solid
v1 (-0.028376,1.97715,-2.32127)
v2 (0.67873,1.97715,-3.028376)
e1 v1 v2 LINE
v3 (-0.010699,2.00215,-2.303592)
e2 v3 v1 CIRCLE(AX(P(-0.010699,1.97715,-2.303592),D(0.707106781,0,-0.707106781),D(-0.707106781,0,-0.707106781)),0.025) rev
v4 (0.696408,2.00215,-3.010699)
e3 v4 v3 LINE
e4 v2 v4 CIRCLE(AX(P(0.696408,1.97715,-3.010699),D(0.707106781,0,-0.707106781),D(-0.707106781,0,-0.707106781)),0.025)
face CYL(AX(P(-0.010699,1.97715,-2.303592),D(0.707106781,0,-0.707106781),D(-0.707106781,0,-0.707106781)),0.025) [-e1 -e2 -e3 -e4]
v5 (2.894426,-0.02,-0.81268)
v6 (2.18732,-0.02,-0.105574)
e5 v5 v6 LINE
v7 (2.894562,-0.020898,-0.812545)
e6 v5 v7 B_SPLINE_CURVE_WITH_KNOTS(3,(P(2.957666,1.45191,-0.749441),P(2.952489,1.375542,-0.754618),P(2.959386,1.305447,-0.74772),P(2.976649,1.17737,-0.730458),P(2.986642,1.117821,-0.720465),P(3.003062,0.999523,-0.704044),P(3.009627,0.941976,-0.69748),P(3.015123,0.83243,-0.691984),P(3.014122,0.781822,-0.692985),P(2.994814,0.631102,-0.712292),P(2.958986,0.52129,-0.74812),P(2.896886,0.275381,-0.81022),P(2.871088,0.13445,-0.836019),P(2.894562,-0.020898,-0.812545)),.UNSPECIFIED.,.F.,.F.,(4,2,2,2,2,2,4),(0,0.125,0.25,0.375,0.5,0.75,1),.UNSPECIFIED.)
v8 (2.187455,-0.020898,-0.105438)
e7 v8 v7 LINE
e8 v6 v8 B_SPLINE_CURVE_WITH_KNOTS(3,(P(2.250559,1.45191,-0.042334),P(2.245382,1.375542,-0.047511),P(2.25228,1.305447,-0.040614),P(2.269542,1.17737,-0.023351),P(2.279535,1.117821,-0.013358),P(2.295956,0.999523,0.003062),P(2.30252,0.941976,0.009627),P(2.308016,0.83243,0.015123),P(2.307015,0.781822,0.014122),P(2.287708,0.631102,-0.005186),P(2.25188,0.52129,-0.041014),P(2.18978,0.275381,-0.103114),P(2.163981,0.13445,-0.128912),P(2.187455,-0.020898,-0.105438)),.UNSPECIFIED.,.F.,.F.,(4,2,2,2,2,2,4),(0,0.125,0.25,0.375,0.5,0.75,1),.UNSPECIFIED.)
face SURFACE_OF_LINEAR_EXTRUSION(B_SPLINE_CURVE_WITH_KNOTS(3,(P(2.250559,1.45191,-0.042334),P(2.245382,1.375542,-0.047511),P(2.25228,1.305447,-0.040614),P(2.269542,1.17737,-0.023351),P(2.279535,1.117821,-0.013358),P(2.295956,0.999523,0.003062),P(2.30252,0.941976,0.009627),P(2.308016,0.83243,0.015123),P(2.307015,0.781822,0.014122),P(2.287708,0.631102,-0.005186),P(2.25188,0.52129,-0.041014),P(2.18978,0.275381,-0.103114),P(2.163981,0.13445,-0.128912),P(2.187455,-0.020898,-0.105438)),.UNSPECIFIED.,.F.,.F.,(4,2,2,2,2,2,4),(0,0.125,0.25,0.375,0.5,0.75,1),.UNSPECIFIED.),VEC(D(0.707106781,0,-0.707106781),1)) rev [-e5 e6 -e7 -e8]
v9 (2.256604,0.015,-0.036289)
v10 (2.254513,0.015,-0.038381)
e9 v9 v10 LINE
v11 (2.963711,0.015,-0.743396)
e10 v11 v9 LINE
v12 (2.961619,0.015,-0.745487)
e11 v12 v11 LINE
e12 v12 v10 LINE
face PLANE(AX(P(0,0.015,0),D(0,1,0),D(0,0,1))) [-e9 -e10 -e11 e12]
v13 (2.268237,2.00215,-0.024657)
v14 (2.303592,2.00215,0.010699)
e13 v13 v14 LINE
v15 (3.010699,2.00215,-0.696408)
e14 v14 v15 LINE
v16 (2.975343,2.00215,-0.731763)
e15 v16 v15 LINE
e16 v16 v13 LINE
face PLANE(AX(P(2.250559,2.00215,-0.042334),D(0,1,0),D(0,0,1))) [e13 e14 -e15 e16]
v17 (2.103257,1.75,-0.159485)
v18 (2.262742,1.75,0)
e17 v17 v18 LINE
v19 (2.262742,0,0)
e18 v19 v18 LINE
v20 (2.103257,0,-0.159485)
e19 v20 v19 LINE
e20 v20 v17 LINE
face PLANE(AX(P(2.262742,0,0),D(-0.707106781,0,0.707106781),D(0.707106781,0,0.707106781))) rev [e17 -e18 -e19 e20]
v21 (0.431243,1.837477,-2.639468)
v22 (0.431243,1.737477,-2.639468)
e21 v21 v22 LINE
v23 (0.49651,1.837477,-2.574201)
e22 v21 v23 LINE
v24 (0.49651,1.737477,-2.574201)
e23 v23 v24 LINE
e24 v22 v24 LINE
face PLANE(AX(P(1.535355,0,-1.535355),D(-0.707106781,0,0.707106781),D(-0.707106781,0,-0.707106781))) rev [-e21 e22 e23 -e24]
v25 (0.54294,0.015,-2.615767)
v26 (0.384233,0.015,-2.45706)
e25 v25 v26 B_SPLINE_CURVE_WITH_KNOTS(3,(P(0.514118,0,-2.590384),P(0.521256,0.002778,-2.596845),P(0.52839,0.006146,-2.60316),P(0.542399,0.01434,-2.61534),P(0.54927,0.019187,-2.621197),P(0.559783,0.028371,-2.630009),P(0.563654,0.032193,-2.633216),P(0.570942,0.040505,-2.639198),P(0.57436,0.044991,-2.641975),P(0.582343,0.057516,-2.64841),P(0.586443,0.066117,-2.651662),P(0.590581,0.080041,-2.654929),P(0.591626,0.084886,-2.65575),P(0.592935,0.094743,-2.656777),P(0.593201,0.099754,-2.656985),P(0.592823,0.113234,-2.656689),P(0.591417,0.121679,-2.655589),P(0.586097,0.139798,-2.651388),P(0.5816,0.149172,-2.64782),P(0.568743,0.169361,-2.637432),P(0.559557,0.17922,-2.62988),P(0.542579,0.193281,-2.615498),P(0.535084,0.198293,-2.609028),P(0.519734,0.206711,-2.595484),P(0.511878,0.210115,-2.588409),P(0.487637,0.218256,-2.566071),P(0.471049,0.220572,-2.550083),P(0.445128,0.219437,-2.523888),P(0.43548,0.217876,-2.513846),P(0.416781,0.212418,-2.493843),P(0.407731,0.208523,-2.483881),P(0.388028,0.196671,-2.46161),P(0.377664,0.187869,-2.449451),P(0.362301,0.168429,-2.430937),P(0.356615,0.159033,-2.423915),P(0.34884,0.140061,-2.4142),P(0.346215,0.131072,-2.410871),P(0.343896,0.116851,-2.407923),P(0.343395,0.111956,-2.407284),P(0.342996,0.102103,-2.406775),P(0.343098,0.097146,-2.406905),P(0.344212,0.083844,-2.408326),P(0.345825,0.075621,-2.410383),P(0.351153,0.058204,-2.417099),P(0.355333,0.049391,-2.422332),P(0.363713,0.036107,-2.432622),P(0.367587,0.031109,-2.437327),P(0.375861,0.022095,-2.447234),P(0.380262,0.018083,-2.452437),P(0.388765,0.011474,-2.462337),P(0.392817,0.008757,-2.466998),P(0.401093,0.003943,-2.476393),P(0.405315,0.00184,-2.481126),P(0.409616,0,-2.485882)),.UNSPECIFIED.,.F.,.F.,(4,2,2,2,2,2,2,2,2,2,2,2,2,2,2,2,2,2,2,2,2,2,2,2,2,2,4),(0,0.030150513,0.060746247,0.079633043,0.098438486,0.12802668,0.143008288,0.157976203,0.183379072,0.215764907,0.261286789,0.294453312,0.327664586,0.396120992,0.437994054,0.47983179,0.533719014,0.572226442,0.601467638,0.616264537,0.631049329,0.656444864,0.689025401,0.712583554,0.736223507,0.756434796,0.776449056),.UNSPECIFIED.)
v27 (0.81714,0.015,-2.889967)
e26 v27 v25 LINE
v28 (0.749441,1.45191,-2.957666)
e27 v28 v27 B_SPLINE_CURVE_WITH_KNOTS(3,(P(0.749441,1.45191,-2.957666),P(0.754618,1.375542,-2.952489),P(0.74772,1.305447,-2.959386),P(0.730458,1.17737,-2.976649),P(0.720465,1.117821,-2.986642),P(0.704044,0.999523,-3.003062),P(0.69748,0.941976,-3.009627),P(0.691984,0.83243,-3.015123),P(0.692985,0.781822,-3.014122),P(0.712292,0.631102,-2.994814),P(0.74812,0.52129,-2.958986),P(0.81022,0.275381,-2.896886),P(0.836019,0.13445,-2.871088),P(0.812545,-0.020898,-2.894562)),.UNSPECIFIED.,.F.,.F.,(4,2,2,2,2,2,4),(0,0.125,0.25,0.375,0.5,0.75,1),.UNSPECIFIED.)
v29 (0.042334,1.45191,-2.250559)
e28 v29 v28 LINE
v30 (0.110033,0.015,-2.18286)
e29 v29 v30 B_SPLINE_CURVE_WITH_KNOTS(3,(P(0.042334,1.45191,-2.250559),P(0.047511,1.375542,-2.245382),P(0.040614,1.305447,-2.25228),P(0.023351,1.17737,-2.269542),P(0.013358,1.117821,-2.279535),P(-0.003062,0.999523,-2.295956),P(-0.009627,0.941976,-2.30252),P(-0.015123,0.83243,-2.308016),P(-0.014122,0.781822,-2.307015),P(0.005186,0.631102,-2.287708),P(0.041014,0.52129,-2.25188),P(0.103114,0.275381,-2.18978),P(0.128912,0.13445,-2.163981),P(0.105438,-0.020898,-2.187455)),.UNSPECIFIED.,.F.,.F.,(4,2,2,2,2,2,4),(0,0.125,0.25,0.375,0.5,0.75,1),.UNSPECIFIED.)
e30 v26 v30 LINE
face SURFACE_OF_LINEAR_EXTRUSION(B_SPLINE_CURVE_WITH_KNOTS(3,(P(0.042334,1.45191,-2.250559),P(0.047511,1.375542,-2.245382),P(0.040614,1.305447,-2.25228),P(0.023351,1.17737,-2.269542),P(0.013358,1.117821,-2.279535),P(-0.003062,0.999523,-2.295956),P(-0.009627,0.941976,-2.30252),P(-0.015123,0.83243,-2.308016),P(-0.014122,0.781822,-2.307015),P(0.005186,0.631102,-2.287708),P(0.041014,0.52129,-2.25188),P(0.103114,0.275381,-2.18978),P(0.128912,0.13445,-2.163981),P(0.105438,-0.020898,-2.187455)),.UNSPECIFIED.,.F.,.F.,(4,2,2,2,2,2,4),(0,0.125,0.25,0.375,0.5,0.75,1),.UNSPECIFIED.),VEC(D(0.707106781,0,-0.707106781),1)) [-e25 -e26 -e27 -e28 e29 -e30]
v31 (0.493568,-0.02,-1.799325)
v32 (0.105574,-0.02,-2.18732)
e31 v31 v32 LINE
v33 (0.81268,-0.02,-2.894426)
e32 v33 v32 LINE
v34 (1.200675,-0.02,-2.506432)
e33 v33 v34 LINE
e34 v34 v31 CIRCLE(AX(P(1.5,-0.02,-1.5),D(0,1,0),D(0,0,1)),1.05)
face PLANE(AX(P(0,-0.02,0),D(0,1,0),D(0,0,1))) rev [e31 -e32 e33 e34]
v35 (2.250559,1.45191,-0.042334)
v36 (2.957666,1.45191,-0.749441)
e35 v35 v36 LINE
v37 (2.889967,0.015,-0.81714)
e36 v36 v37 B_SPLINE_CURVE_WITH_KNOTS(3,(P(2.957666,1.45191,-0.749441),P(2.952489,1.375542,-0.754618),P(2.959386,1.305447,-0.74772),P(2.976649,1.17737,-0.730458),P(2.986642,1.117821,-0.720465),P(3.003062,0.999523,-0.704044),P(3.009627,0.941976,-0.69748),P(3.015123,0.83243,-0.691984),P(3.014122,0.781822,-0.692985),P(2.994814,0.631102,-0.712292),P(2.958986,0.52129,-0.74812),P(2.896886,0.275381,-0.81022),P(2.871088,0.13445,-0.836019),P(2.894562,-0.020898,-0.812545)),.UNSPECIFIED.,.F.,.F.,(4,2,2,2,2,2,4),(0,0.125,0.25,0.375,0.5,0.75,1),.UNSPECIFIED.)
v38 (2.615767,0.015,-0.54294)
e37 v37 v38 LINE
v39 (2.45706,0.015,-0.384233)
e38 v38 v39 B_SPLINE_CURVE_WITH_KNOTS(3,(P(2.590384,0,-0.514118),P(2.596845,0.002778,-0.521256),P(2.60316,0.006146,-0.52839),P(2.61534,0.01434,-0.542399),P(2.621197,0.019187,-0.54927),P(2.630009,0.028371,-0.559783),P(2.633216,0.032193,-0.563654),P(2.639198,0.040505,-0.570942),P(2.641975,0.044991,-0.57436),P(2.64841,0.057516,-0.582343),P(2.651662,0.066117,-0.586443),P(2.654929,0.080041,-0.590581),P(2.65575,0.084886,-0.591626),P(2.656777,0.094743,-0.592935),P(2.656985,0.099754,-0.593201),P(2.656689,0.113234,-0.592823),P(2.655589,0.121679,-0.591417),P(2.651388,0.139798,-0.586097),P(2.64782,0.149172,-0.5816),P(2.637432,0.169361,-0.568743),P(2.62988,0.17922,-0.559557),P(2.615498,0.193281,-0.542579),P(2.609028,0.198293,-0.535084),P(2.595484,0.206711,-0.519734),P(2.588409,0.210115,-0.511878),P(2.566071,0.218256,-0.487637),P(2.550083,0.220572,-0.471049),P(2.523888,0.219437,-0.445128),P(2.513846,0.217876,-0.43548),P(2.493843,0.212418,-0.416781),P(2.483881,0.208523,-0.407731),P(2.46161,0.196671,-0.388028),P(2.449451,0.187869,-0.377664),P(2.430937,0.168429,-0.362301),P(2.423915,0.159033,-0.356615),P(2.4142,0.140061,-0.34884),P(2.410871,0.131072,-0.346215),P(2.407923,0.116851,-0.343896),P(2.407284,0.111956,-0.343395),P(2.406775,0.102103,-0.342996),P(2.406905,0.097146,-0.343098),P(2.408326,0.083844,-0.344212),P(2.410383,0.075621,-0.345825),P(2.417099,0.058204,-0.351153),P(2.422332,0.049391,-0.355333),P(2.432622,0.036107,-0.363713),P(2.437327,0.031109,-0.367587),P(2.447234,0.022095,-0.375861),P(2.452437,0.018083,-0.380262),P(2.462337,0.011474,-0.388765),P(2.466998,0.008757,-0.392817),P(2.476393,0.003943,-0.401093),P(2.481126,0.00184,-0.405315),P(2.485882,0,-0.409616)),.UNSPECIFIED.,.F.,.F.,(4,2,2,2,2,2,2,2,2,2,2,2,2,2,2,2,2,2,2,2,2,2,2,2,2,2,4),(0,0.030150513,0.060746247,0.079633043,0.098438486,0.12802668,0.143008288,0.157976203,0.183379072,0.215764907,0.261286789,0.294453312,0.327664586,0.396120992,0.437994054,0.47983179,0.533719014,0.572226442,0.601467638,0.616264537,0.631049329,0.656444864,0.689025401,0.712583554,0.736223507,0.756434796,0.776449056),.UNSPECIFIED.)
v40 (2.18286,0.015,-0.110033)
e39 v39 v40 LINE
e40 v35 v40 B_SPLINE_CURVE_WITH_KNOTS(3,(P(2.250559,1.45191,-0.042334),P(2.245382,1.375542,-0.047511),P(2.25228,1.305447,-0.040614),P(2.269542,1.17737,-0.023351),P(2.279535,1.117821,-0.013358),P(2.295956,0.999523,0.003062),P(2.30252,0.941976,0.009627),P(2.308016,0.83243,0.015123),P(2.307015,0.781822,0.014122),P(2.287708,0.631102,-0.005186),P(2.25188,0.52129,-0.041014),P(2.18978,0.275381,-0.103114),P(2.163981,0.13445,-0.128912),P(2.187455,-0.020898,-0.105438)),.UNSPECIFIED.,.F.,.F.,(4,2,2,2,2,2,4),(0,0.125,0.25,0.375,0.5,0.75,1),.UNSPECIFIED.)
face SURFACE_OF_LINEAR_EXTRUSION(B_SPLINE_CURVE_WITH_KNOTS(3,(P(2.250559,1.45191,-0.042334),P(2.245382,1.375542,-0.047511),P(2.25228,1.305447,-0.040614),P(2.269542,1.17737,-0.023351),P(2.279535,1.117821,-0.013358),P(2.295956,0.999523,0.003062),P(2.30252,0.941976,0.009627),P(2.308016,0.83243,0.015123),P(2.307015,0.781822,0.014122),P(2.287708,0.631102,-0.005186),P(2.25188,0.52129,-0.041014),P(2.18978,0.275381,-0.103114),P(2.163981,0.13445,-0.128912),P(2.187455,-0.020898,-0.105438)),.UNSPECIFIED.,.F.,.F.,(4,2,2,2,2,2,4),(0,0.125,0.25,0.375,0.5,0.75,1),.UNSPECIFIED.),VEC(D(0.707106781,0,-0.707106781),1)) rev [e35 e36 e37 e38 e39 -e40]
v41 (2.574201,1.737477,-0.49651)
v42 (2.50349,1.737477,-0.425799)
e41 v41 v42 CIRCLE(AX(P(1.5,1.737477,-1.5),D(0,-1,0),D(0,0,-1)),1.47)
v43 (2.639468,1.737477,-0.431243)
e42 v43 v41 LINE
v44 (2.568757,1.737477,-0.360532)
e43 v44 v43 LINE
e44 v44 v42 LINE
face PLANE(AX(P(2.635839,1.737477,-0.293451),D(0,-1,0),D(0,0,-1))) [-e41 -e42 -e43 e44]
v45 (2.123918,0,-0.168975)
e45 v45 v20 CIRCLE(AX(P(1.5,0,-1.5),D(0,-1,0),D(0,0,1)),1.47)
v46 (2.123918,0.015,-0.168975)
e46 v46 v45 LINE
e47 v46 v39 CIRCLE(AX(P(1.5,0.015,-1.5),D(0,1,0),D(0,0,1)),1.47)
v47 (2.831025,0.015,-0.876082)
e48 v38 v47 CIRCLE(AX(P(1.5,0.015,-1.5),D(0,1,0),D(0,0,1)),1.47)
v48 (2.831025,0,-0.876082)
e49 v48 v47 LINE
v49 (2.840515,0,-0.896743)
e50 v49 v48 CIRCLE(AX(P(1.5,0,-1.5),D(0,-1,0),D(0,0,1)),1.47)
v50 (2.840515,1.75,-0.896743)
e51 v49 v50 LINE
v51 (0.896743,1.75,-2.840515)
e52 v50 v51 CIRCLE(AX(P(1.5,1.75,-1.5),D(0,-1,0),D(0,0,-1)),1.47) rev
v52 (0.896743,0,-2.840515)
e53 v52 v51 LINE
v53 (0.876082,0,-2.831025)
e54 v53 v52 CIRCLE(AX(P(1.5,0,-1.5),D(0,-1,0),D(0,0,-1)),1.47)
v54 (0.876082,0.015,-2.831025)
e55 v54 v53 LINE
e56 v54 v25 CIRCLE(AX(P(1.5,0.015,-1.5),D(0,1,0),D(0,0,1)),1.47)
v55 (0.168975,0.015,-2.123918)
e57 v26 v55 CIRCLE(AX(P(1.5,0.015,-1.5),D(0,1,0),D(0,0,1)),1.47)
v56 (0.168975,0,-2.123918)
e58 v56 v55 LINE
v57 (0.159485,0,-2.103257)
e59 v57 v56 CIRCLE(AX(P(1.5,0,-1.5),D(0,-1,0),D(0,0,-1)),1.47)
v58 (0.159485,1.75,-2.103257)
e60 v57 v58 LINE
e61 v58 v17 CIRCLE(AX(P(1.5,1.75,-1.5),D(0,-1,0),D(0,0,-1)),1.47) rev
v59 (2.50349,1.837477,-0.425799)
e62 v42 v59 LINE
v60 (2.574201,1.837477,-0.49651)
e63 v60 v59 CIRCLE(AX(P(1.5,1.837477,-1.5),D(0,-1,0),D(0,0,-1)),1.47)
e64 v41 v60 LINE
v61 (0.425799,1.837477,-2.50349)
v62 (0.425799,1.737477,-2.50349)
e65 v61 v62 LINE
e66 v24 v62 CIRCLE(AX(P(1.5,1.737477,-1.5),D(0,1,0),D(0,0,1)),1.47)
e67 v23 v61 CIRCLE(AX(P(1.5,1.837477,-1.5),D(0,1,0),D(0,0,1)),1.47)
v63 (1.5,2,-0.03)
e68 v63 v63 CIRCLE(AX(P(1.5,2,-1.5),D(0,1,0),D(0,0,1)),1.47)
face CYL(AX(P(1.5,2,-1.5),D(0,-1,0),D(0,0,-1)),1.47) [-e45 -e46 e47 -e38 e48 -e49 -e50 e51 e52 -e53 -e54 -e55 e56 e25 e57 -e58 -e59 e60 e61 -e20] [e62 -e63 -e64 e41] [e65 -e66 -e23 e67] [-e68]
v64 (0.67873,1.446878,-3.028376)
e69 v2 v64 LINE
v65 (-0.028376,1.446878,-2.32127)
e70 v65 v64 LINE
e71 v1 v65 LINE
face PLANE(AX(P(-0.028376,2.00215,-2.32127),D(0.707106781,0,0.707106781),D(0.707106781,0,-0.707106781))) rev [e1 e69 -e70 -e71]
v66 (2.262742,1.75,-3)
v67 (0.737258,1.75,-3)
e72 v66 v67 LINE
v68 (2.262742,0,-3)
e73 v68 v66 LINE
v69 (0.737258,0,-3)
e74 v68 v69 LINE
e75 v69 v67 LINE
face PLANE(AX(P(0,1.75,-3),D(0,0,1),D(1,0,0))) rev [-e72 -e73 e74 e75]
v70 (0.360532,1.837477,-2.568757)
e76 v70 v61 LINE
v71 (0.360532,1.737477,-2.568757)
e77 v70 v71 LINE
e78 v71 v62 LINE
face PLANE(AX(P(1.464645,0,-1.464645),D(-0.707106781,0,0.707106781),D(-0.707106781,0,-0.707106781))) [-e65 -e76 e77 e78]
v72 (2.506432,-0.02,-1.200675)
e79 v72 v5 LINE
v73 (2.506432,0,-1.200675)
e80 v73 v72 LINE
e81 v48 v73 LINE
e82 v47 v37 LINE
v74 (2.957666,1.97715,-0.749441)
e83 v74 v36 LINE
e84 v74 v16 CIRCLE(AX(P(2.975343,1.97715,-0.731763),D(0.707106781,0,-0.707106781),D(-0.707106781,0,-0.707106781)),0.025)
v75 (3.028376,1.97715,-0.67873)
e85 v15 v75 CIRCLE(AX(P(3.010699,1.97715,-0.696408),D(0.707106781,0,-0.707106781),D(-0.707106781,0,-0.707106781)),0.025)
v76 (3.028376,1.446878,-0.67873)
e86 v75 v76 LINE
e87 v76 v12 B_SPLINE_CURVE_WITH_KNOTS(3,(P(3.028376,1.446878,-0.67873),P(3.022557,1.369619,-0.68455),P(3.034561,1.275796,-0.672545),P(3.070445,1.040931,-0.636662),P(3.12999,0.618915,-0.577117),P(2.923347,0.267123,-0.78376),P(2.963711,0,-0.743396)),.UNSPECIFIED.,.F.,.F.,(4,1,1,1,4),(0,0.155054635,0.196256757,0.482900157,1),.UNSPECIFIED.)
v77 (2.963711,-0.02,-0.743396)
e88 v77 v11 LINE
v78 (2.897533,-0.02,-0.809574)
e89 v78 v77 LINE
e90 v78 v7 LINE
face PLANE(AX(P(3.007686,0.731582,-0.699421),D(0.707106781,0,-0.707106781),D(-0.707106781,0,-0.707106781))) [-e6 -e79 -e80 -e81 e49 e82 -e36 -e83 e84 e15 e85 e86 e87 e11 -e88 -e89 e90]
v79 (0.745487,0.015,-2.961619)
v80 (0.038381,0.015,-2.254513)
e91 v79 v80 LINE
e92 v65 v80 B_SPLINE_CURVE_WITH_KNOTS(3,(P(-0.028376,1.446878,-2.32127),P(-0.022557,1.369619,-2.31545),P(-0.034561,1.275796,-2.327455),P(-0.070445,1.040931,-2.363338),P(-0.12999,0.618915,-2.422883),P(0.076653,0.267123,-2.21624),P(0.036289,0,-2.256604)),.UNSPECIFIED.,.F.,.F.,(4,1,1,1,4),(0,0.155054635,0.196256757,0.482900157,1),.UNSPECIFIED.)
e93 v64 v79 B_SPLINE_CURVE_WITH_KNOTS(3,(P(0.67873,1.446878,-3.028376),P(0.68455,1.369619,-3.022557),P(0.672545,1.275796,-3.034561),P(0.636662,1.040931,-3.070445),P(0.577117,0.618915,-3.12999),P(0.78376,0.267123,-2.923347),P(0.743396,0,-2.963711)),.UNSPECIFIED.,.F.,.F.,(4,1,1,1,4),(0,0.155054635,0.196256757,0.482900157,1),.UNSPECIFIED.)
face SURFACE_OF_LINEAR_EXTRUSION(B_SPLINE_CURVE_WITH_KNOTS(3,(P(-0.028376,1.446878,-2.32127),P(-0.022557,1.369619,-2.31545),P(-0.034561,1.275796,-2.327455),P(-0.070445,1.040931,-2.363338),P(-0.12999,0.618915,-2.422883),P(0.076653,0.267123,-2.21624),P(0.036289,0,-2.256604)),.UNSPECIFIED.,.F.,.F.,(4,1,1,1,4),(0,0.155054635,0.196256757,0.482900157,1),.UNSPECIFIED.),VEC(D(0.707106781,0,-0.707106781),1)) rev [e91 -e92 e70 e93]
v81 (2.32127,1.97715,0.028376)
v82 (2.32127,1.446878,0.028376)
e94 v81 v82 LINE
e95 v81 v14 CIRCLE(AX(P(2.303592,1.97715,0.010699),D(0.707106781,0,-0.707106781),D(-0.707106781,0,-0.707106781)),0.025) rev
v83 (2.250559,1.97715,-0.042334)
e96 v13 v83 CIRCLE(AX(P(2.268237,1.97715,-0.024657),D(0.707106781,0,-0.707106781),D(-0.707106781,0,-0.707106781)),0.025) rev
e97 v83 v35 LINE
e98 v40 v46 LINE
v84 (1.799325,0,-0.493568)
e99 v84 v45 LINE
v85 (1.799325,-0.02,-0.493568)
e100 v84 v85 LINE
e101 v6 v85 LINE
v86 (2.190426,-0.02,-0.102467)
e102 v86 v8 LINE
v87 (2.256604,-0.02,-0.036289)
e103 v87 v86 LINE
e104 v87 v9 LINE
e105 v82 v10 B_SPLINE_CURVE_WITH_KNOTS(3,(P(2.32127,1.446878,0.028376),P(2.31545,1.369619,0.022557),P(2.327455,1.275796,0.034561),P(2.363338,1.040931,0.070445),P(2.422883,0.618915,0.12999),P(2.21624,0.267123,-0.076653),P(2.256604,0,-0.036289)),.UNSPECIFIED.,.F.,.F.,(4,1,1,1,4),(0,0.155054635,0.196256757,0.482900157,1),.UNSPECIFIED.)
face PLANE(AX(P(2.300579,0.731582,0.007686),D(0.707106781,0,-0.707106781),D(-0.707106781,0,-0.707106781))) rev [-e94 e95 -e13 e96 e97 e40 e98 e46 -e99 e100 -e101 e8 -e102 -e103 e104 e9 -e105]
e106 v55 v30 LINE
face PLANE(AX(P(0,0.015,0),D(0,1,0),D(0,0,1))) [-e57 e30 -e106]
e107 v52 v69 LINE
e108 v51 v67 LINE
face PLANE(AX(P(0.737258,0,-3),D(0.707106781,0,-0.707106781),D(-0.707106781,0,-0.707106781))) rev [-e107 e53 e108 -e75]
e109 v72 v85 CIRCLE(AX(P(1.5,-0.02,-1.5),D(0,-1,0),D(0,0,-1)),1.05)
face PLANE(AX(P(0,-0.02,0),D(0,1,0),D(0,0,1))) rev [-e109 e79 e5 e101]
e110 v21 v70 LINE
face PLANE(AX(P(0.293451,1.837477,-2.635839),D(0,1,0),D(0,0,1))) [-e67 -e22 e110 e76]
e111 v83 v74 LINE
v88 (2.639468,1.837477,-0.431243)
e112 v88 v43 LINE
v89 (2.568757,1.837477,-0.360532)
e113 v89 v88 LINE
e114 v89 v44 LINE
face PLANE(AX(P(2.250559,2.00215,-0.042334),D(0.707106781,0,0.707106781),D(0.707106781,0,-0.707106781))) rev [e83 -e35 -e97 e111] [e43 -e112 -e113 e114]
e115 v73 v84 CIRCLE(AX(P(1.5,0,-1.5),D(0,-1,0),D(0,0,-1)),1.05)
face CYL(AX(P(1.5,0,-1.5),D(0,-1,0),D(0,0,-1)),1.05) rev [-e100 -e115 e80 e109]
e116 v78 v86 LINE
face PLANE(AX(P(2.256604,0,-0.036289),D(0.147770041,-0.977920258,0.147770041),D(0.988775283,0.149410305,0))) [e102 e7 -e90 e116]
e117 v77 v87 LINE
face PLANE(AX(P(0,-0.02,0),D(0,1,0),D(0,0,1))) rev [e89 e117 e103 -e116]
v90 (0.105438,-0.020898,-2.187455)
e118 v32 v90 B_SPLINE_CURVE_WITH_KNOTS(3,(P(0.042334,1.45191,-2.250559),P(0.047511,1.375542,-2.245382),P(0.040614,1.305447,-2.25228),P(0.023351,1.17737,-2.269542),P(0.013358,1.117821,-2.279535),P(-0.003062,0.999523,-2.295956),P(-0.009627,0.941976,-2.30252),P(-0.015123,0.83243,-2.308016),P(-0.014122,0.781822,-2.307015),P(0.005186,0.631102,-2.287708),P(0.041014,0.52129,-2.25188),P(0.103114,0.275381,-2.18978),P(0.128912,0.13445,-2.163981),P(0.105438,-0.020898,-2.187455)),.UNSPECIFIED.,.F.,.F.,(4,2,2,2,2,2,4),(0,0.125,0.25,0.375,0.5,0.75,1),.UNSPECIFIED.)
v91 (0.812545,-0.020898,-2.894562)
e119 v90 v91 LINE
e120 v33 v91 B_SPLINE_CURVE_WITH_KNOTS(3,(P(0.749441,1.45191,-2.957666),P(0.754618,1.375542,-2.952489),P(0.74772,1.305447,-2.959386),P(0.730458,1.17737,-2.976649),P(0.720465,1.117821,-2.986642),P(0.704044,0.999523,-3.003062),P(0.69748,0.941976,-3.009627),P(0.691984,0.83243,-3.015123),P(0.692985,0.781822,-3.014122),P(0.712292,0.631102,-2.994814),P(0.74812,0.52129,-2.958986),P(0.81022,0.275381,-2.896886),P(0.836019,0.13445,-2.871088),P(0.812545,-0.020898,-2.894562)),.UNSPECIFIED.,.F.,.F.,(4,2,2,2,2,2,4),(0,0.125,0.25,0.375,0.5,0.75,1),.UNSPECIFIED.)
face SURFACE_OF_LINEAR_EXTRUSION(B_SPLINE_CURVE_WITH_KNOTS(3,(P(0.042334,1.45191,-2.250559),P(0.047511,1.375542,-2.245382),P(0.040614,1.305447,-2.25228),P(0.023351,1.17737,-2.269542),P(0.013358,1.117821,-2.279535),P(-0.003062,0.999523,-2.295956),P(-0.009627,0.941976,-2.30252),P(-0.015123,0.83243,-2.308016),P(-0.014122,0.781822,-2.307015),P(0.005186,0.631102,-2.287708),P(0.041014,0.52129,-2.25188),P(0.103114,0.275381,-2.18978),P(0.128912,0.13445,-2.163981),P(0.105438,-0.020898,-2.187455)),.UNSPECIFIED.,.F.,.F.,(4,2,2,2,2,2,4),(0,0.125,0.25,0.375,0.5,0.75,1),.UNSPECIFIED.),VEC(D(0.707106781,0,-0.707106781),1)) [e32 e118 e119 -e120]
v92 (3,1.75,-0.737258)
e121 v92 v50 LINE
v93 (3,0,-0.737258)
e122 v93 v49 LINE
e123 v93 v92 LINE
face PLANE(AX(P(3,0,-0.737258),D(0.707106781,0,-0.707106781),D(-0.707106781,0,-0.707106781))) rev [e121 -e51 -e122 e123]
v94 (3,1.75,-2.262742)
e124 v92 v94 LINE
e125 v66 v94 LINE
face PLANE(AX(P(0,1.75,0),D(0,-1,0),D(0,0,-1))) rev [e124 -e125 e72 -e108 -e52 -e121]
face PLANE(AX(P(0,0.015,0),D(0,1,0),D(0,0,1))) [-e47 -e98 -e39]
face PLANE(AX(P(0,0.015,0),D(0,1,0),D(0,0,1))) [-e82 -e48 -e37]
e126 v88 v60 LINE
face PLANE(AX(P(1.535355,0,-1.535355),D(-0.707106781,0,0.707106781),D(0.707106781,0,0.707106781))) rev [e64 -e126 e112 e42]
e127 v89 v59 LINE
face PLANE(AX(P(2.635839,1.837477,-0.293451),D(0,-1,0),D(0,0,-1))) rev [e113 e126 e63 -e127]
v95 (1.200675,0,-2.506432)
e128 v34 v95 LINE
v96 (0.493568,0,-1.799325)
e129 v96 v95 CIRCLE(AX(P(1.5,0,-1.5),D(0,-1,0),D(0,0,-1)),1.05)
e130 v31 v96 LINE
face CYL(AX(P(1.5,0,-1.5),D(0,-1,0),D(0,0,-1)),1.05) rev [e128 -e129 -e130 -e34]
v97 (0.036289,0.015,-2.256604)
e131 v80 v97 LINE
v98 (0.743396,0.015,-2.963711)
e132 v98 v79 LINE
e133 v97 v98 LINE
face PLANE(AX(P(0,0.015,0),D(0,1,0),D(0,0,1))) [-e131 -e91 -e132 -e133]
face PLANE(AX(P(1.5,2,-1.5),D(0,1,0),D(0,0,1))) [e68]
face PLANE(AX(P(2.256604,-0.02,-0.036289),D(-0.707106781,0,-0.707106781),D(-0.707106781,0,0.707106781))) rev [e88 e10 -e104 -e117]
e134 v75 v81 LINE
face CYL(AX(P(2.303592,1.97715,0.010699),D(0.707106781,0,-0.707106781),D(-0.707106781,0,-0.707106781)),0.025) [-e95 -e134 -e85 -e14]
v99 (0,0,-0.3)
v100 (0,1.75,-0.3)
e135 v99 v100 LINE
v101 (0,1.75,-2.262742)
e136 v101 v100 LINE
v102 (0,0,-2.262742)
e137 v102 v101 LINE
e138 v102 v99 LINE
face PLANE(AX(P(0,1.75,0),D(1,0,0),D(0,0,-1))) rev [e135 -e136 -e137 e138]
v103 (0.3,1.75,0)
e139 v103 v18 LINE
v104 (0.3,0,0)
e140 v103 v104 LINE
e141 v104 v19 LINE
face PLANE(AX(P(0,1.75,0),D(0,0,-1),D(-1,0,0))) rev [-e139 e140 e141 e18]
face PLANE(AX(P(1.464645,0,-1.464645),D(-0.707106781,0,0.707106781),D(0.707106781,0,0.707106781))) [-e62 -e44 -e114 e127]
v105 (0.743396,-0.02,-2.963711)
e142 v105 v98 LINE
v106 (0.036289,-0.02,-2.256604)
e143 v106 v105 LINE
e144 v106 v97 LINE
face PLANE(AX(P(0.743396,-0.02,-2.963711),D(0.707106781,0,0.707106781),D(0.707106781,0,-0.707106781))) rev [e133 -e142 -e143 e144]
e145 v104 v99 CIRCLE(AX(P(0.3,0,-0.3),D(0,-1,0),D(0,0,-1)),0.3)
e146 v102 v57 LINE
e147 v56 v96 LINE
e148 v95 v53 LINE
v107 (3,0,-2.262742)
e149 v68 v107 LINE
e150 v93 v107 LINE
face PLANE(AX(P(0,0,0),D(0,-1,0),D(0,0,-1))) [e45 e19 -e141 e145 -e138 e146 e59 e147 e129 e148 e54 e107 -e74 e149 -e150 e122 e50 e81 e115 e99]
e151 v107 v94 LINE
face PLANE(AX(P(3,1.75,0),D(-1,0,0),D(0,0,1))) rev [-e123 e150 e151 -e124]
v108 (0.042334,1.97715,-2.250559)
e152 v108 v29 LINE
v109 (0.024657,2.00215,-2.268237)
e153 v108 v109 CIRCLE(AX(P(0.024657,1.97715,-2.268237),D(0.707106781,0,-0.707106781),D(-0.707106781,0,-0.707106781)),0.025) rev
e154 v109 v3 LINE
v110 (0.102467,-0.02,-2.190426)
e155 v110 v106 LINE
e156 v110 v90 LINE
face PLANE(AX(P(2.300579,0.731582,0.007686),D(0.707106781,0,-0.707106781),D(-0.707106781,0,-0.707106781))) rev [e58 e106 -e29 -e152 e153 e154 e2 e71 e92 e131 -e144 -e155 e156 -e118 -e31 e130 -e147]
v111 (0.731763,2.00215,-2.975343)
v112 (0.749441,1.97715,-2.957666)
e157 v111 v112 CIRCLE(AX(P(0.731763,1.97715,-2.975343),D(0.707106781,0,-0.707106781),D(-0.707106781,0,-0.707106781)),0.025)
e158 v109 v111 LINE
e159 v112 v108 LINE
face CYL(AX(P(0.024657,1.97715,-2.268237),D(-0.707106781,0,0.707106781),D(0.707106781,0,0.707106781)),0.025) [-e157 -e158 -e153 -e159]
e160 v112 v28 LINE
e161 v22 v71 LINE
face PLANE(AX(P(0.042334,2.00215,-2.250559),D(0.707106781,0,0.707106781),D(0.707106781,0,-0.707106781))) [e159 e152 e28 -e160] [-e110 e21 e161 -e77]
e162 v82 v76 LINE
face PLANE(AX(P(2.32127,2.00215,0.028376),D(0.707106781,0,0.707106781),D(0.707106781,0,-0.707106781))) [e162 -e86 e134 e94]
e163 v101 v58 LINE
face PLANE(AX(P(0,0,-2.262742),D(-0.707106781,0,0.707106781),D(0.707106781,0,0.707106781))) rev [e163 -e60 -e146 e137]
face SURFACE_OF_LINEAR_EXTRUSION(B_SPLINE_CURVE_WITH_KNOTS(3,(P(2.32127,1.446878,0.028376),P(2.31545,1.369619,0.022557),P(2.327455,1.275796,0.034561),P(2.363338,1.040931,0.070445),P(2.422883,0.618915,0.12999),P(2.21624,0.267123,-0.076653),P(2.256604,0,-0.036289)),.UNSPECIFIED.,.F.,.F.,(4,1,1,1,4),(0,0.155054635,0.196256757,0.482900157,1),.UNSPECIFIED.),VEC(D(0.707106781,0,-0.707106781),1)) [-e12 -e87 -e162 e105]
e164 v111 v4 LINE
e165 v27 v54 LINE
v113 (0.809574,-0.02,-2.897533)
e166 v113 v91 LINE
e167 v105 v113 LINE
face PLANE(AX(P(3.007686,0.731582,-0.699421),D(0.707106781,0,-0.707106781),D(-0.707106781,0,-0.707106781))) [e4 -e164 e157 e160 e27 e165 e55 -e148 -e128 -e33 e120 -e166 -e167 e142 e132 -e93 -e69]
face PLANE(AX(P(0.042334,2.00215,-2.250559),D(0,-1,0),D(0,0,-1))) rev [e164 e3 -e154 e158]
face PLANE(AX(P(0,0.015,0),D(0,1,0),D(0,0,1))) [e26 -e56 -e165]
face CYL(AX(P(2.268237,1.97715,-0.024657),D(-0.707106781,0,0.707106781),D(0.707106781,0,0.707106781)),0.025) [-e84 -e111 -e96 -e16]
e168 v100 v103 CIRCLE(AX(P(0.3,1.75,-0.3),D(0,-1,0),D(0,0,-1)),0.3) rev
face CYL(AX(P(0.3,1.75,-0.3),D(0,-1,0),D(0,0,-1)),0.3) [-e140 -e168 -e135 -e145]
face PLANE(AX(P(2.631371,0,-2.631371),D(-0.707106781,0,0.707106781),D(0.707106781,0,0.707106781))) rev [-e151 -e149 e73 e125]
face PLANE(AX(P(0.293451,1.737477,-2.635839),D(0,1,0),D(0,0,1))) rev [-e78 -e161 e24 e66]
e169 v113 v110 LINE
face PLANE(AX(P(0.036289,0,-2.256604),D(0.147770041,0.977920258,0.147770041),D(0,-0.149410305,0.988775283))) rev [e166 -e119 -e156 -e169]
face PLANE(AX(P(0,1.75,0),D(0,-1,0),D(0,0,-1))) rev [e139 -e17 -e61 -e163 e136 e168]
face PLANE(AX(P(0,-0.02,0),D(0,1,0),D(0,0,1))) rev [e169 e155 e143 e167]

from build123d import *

# Parameters (mm, degrees)
SKETCH1_W            = 3
SKETCH1_H            = 3
BOSS_EXTRUDE1_DEPTH  = 1.75
CUT_EXTRUDE1_DEPTH   = 5.589389938
FILLET2_R            = 0.3
SKETCH4_R            = 1.47
BOSS_EXTRUDE2_DEPTH  = 0.25
CUT_EXTRUDE2_START   = -1.75
CUT_EXTRUDE2_DEPTH   = 1.75
EXTRUDE_THIN2_START  = -0.5
EXTRUDE_THIN2_DEPTH  = 1
SKETCH8_W            = 0.275860762
SKETCH8_H            = 0.1
EXTRUDE_THIN5_DEPTH  = 0.05
FILLET3_R            = 0.025
FILLET3_OF_MIRROR1_R = 0.025
BOSS_EXTRUDE3_START  = -0.015
BOSS_EXTRUDE3_DEPTH  = 0.035
SKETCH11_R           = 1.05
CUT_EXTRUDE3_DEPTH   = 0.02


# Read off the part's stored shape, not the designer's step: Extrude-Thin2
with BuildPart() as part:
    # Sketch1 → Boss-Extrude1 (new body)
    with BuildSketch(Plane(origin=(0, 0, 0), x_dir=(1, 0, 0), z_dir=(0, 1, 0))):
        with Locations((1.5, 1.5)):
            Rectangle(SKETCH1_W, SKETCH1_H)
    extrude(amount=BOSS_EXTRUDE1_DEPTH)

    # Sketch3 → Cut-Extrude1 (cut, through all)
    with BuildSketch(Plane(origin=(0, 1.75, 0), x_dir=(1, 0, 0), z_dir=(0, 1, 0))):
        Polygon((2.2627417, 0), (3, 0), (3, 0.7372583), (2.63137085, 0.36862915), align=None)
        Polygon((0, 3), (0, 2.2627417), (0.36862915, 2.63137085), (0.7372583, 3), align=None)
        Polygon((2.63137085, 2.63137085), (2.2627417, 3), (3, 3), (3, 2.2627417), align=None)
    extrude(amount=-CUT_EXTRUDE1_DEPTH, mode=Mode.SUBTRACT)

    # Fillet2
    fillet2_edges = [part.edges().sort_by_distance(p)[0] for p in [
        (0, 0.875, 0),
    ]]
    fillet(fillet2_edges, radius=FILLET2_R)

    # Sketch4 → Boss-Extrude2 (add)
    with BuildSketch(Plane(origin=(0, 1.75, 0), x_dir=(1, 0, 0), z_dir=(0, 1, 0))):
        with Locations(Location((1.5, 1.5, 0), (0, 0, 90))):
            Circle(SKETCH4_R)
    extrude(amount=BOSS_EXTRUDE2_DEPTH)

    # Sketch5 → Cut-Extrude2 (cut)
    with BuildSketch(Plane(origin=(0, 1.75, 0), x_dir=(1, 0, 0), z_dir=(0, 1, 0)).offset(CUT_EXTRUDE2_START)):
        with BuildLine():
            Line((2.2627417, 0), (2.103256928, 0.159484771))
            ThreePointArc((2.103256928, 0.159484771), (2.539446968, 0.460553032), (2.840515229, 0.896743072))
            Line((2.840515229, 0.896743072), (3, 0.7372583))
            Line((3, 0.7372583), (2.2627417, 0))
        make_face()
        with BuildLine():
            Line((0, 2.2627417), (0.7372583, 3))
            Line((0.7372583, 3), (0.896743072, 2.840515229))
            ThreePointArc((0.896743072, 2.840515229), (0.460553032, 2.539446968), (0.159484771, 2.103256928))
            Line((0.159484771, 2.103256928), (0, 2.2627417))
        make_face()
    extrude(amount=CUT_EXTRUDE2_DEPTH, mode=Mode.SUBTRACT)

    # Extrude-Thin2 outline → Extrude-Thin2 (add)
    with BuildSketch(Plane(origin=(1.5, 0, -1.5), x_dir=(0.7071067811865562, 0, 0.7071067811865389), z_dir=(-0.7071067811865389, 0, 0.7071067811865562)).offset(EXTRUDE_THIN2_START)):
        with BuildLine():
            Line((1.561450527, 2.002149754), (1.561450527, 1.451909895))
            add(Edge.make_bspline(
                [(1.561450527, 1.451909895), (1.554129937, 1.375541591), (1.563884147, 1.305446664), (1.588296687, 1.177370221), (1.602428817, 1.117821497), (1.625651298, 0.999523371), (1.634934751, 0.941975625), (1.642707118, 0.832429946), (1.641292118, 0.781821785), (1.613986886, 0.631102389), (1.563318355, 0.52128951), (1.475495605, 0.275380517), (1.439010548, 0.134450447), (1.472207974, -0.02089784)],
                knots=[0, 0, 0, 0, 0.125, 0.125, 0.25, 0.25, 0.375, 0.375, 0.5, 0.5, 0.75, 0.75, 1, 1, 1, 1], degree=3))
            Line((1.472207974, -0.02089784), (1.57, 0))
            add(Edge.make_bspline(
                [(1.661450527, 1.446877551), (1.653220606, 1.369619132), (1.670197461, 1.275795935), (1.720944437, 1.040930532), (1.805154039, 0.618915062), (1.512916634, 0.267123211), (1.57, 0)],
                knots=[0, 0, 0, 0, 0.155054635, 0.196256757, 0.482900157, 1, 1, 1, 1], degree=3))
            Line((1.661450527, 1.446877551), (1.661450527, 2.002149754))
            Line((1.661450527, 2.002149754), (1.561450527, 2.002149754))
        make_face()
    extrude_thin2 = extrude(amount=EXTRUDE_THIN2_DEPTH)

    # Sketch8 → Extrude-Thin5 (add, symmetric)
    with BuildSketch(Plane(origin=(1.5, 0, -1.5), x_dir=(0.7071067811865562, 0, 0.7071067811865389), z_dir=(-0.7071067811865389, 0, 0.7071067811865562))):
        with Locations((1.518388241, 1.787476875)):
            Rectangle(SKETCH8_W, SKETCH8_H)
    extrude_thin5 = extrude(amount=EXTRUDE_THIN5_DEPTH, both=True)

    # Fillet3
    fillet3_edges = [part.edges().sort_by_distance(p)[0] for p in [
        (2.674822934, 2.002149754, -0.325177066),
        (2.604112256, 2.002149754, -0.395887744),
    ]]
    fillet(fillet3_edges, radius=FILLET3_R)

    # Mirror1: Extrude-Thin2, Extrude-Thin5 across plane
    add(extrude_thin2.mirror(Plane(origin=(0, 0, 0), x_dir=(-0.7071067811865466, 0, 0.7071067811865486), z_dir=(0.7071067811865487, 0, 0.7071067811865465))))
    add(extrude_thin5.mirror(Plane(origin=(0, 0, 0), x_dir=(-0.7071067811865466, 0, 0.7071067811865486), z_dir=(0.7071067811865487, 0, 0.7071067811865465))))

    # Fillet3 of Mirror1
    fillet3_of_mirror1_edges = [part.edges().sort_by_distance(p)[0] for p in [
        (0.325177066, 2.002149754, -2.674822934),
        (0.395887744, 2.002149754, -2.604112256),
    ]]
    fillet(fillet3_of_mirror1_edges, radius=FILLET3_OF_MIRROR1_R)

    # Sketch10 → Boss-Extrude3 (add)
    with BuildSketch(Plane.XZ.offset(BOSS_EXTRUDE3_START)):
        Polygon((0.036288963, -2.256604256), (2.256604256, -0.036288963), (2.963711037, -0.743395744), (0.743395744, -2.963711037), align=None)
    extrude(amount=BOSS_EXTRUDE3_DEPTH)

    # Sketch11 → Cut-Extrude3 (cut)
    with BuildSketch(Plane.XZ.offset(0.02)):
        with Locations((1.5, -1.5)):
            Circle(SKETCH11_R)
    extrude(amount=-CUT_EXTRUDE3_DEPTH, mode=Mode.SUBTRACT)


solid = part.part
